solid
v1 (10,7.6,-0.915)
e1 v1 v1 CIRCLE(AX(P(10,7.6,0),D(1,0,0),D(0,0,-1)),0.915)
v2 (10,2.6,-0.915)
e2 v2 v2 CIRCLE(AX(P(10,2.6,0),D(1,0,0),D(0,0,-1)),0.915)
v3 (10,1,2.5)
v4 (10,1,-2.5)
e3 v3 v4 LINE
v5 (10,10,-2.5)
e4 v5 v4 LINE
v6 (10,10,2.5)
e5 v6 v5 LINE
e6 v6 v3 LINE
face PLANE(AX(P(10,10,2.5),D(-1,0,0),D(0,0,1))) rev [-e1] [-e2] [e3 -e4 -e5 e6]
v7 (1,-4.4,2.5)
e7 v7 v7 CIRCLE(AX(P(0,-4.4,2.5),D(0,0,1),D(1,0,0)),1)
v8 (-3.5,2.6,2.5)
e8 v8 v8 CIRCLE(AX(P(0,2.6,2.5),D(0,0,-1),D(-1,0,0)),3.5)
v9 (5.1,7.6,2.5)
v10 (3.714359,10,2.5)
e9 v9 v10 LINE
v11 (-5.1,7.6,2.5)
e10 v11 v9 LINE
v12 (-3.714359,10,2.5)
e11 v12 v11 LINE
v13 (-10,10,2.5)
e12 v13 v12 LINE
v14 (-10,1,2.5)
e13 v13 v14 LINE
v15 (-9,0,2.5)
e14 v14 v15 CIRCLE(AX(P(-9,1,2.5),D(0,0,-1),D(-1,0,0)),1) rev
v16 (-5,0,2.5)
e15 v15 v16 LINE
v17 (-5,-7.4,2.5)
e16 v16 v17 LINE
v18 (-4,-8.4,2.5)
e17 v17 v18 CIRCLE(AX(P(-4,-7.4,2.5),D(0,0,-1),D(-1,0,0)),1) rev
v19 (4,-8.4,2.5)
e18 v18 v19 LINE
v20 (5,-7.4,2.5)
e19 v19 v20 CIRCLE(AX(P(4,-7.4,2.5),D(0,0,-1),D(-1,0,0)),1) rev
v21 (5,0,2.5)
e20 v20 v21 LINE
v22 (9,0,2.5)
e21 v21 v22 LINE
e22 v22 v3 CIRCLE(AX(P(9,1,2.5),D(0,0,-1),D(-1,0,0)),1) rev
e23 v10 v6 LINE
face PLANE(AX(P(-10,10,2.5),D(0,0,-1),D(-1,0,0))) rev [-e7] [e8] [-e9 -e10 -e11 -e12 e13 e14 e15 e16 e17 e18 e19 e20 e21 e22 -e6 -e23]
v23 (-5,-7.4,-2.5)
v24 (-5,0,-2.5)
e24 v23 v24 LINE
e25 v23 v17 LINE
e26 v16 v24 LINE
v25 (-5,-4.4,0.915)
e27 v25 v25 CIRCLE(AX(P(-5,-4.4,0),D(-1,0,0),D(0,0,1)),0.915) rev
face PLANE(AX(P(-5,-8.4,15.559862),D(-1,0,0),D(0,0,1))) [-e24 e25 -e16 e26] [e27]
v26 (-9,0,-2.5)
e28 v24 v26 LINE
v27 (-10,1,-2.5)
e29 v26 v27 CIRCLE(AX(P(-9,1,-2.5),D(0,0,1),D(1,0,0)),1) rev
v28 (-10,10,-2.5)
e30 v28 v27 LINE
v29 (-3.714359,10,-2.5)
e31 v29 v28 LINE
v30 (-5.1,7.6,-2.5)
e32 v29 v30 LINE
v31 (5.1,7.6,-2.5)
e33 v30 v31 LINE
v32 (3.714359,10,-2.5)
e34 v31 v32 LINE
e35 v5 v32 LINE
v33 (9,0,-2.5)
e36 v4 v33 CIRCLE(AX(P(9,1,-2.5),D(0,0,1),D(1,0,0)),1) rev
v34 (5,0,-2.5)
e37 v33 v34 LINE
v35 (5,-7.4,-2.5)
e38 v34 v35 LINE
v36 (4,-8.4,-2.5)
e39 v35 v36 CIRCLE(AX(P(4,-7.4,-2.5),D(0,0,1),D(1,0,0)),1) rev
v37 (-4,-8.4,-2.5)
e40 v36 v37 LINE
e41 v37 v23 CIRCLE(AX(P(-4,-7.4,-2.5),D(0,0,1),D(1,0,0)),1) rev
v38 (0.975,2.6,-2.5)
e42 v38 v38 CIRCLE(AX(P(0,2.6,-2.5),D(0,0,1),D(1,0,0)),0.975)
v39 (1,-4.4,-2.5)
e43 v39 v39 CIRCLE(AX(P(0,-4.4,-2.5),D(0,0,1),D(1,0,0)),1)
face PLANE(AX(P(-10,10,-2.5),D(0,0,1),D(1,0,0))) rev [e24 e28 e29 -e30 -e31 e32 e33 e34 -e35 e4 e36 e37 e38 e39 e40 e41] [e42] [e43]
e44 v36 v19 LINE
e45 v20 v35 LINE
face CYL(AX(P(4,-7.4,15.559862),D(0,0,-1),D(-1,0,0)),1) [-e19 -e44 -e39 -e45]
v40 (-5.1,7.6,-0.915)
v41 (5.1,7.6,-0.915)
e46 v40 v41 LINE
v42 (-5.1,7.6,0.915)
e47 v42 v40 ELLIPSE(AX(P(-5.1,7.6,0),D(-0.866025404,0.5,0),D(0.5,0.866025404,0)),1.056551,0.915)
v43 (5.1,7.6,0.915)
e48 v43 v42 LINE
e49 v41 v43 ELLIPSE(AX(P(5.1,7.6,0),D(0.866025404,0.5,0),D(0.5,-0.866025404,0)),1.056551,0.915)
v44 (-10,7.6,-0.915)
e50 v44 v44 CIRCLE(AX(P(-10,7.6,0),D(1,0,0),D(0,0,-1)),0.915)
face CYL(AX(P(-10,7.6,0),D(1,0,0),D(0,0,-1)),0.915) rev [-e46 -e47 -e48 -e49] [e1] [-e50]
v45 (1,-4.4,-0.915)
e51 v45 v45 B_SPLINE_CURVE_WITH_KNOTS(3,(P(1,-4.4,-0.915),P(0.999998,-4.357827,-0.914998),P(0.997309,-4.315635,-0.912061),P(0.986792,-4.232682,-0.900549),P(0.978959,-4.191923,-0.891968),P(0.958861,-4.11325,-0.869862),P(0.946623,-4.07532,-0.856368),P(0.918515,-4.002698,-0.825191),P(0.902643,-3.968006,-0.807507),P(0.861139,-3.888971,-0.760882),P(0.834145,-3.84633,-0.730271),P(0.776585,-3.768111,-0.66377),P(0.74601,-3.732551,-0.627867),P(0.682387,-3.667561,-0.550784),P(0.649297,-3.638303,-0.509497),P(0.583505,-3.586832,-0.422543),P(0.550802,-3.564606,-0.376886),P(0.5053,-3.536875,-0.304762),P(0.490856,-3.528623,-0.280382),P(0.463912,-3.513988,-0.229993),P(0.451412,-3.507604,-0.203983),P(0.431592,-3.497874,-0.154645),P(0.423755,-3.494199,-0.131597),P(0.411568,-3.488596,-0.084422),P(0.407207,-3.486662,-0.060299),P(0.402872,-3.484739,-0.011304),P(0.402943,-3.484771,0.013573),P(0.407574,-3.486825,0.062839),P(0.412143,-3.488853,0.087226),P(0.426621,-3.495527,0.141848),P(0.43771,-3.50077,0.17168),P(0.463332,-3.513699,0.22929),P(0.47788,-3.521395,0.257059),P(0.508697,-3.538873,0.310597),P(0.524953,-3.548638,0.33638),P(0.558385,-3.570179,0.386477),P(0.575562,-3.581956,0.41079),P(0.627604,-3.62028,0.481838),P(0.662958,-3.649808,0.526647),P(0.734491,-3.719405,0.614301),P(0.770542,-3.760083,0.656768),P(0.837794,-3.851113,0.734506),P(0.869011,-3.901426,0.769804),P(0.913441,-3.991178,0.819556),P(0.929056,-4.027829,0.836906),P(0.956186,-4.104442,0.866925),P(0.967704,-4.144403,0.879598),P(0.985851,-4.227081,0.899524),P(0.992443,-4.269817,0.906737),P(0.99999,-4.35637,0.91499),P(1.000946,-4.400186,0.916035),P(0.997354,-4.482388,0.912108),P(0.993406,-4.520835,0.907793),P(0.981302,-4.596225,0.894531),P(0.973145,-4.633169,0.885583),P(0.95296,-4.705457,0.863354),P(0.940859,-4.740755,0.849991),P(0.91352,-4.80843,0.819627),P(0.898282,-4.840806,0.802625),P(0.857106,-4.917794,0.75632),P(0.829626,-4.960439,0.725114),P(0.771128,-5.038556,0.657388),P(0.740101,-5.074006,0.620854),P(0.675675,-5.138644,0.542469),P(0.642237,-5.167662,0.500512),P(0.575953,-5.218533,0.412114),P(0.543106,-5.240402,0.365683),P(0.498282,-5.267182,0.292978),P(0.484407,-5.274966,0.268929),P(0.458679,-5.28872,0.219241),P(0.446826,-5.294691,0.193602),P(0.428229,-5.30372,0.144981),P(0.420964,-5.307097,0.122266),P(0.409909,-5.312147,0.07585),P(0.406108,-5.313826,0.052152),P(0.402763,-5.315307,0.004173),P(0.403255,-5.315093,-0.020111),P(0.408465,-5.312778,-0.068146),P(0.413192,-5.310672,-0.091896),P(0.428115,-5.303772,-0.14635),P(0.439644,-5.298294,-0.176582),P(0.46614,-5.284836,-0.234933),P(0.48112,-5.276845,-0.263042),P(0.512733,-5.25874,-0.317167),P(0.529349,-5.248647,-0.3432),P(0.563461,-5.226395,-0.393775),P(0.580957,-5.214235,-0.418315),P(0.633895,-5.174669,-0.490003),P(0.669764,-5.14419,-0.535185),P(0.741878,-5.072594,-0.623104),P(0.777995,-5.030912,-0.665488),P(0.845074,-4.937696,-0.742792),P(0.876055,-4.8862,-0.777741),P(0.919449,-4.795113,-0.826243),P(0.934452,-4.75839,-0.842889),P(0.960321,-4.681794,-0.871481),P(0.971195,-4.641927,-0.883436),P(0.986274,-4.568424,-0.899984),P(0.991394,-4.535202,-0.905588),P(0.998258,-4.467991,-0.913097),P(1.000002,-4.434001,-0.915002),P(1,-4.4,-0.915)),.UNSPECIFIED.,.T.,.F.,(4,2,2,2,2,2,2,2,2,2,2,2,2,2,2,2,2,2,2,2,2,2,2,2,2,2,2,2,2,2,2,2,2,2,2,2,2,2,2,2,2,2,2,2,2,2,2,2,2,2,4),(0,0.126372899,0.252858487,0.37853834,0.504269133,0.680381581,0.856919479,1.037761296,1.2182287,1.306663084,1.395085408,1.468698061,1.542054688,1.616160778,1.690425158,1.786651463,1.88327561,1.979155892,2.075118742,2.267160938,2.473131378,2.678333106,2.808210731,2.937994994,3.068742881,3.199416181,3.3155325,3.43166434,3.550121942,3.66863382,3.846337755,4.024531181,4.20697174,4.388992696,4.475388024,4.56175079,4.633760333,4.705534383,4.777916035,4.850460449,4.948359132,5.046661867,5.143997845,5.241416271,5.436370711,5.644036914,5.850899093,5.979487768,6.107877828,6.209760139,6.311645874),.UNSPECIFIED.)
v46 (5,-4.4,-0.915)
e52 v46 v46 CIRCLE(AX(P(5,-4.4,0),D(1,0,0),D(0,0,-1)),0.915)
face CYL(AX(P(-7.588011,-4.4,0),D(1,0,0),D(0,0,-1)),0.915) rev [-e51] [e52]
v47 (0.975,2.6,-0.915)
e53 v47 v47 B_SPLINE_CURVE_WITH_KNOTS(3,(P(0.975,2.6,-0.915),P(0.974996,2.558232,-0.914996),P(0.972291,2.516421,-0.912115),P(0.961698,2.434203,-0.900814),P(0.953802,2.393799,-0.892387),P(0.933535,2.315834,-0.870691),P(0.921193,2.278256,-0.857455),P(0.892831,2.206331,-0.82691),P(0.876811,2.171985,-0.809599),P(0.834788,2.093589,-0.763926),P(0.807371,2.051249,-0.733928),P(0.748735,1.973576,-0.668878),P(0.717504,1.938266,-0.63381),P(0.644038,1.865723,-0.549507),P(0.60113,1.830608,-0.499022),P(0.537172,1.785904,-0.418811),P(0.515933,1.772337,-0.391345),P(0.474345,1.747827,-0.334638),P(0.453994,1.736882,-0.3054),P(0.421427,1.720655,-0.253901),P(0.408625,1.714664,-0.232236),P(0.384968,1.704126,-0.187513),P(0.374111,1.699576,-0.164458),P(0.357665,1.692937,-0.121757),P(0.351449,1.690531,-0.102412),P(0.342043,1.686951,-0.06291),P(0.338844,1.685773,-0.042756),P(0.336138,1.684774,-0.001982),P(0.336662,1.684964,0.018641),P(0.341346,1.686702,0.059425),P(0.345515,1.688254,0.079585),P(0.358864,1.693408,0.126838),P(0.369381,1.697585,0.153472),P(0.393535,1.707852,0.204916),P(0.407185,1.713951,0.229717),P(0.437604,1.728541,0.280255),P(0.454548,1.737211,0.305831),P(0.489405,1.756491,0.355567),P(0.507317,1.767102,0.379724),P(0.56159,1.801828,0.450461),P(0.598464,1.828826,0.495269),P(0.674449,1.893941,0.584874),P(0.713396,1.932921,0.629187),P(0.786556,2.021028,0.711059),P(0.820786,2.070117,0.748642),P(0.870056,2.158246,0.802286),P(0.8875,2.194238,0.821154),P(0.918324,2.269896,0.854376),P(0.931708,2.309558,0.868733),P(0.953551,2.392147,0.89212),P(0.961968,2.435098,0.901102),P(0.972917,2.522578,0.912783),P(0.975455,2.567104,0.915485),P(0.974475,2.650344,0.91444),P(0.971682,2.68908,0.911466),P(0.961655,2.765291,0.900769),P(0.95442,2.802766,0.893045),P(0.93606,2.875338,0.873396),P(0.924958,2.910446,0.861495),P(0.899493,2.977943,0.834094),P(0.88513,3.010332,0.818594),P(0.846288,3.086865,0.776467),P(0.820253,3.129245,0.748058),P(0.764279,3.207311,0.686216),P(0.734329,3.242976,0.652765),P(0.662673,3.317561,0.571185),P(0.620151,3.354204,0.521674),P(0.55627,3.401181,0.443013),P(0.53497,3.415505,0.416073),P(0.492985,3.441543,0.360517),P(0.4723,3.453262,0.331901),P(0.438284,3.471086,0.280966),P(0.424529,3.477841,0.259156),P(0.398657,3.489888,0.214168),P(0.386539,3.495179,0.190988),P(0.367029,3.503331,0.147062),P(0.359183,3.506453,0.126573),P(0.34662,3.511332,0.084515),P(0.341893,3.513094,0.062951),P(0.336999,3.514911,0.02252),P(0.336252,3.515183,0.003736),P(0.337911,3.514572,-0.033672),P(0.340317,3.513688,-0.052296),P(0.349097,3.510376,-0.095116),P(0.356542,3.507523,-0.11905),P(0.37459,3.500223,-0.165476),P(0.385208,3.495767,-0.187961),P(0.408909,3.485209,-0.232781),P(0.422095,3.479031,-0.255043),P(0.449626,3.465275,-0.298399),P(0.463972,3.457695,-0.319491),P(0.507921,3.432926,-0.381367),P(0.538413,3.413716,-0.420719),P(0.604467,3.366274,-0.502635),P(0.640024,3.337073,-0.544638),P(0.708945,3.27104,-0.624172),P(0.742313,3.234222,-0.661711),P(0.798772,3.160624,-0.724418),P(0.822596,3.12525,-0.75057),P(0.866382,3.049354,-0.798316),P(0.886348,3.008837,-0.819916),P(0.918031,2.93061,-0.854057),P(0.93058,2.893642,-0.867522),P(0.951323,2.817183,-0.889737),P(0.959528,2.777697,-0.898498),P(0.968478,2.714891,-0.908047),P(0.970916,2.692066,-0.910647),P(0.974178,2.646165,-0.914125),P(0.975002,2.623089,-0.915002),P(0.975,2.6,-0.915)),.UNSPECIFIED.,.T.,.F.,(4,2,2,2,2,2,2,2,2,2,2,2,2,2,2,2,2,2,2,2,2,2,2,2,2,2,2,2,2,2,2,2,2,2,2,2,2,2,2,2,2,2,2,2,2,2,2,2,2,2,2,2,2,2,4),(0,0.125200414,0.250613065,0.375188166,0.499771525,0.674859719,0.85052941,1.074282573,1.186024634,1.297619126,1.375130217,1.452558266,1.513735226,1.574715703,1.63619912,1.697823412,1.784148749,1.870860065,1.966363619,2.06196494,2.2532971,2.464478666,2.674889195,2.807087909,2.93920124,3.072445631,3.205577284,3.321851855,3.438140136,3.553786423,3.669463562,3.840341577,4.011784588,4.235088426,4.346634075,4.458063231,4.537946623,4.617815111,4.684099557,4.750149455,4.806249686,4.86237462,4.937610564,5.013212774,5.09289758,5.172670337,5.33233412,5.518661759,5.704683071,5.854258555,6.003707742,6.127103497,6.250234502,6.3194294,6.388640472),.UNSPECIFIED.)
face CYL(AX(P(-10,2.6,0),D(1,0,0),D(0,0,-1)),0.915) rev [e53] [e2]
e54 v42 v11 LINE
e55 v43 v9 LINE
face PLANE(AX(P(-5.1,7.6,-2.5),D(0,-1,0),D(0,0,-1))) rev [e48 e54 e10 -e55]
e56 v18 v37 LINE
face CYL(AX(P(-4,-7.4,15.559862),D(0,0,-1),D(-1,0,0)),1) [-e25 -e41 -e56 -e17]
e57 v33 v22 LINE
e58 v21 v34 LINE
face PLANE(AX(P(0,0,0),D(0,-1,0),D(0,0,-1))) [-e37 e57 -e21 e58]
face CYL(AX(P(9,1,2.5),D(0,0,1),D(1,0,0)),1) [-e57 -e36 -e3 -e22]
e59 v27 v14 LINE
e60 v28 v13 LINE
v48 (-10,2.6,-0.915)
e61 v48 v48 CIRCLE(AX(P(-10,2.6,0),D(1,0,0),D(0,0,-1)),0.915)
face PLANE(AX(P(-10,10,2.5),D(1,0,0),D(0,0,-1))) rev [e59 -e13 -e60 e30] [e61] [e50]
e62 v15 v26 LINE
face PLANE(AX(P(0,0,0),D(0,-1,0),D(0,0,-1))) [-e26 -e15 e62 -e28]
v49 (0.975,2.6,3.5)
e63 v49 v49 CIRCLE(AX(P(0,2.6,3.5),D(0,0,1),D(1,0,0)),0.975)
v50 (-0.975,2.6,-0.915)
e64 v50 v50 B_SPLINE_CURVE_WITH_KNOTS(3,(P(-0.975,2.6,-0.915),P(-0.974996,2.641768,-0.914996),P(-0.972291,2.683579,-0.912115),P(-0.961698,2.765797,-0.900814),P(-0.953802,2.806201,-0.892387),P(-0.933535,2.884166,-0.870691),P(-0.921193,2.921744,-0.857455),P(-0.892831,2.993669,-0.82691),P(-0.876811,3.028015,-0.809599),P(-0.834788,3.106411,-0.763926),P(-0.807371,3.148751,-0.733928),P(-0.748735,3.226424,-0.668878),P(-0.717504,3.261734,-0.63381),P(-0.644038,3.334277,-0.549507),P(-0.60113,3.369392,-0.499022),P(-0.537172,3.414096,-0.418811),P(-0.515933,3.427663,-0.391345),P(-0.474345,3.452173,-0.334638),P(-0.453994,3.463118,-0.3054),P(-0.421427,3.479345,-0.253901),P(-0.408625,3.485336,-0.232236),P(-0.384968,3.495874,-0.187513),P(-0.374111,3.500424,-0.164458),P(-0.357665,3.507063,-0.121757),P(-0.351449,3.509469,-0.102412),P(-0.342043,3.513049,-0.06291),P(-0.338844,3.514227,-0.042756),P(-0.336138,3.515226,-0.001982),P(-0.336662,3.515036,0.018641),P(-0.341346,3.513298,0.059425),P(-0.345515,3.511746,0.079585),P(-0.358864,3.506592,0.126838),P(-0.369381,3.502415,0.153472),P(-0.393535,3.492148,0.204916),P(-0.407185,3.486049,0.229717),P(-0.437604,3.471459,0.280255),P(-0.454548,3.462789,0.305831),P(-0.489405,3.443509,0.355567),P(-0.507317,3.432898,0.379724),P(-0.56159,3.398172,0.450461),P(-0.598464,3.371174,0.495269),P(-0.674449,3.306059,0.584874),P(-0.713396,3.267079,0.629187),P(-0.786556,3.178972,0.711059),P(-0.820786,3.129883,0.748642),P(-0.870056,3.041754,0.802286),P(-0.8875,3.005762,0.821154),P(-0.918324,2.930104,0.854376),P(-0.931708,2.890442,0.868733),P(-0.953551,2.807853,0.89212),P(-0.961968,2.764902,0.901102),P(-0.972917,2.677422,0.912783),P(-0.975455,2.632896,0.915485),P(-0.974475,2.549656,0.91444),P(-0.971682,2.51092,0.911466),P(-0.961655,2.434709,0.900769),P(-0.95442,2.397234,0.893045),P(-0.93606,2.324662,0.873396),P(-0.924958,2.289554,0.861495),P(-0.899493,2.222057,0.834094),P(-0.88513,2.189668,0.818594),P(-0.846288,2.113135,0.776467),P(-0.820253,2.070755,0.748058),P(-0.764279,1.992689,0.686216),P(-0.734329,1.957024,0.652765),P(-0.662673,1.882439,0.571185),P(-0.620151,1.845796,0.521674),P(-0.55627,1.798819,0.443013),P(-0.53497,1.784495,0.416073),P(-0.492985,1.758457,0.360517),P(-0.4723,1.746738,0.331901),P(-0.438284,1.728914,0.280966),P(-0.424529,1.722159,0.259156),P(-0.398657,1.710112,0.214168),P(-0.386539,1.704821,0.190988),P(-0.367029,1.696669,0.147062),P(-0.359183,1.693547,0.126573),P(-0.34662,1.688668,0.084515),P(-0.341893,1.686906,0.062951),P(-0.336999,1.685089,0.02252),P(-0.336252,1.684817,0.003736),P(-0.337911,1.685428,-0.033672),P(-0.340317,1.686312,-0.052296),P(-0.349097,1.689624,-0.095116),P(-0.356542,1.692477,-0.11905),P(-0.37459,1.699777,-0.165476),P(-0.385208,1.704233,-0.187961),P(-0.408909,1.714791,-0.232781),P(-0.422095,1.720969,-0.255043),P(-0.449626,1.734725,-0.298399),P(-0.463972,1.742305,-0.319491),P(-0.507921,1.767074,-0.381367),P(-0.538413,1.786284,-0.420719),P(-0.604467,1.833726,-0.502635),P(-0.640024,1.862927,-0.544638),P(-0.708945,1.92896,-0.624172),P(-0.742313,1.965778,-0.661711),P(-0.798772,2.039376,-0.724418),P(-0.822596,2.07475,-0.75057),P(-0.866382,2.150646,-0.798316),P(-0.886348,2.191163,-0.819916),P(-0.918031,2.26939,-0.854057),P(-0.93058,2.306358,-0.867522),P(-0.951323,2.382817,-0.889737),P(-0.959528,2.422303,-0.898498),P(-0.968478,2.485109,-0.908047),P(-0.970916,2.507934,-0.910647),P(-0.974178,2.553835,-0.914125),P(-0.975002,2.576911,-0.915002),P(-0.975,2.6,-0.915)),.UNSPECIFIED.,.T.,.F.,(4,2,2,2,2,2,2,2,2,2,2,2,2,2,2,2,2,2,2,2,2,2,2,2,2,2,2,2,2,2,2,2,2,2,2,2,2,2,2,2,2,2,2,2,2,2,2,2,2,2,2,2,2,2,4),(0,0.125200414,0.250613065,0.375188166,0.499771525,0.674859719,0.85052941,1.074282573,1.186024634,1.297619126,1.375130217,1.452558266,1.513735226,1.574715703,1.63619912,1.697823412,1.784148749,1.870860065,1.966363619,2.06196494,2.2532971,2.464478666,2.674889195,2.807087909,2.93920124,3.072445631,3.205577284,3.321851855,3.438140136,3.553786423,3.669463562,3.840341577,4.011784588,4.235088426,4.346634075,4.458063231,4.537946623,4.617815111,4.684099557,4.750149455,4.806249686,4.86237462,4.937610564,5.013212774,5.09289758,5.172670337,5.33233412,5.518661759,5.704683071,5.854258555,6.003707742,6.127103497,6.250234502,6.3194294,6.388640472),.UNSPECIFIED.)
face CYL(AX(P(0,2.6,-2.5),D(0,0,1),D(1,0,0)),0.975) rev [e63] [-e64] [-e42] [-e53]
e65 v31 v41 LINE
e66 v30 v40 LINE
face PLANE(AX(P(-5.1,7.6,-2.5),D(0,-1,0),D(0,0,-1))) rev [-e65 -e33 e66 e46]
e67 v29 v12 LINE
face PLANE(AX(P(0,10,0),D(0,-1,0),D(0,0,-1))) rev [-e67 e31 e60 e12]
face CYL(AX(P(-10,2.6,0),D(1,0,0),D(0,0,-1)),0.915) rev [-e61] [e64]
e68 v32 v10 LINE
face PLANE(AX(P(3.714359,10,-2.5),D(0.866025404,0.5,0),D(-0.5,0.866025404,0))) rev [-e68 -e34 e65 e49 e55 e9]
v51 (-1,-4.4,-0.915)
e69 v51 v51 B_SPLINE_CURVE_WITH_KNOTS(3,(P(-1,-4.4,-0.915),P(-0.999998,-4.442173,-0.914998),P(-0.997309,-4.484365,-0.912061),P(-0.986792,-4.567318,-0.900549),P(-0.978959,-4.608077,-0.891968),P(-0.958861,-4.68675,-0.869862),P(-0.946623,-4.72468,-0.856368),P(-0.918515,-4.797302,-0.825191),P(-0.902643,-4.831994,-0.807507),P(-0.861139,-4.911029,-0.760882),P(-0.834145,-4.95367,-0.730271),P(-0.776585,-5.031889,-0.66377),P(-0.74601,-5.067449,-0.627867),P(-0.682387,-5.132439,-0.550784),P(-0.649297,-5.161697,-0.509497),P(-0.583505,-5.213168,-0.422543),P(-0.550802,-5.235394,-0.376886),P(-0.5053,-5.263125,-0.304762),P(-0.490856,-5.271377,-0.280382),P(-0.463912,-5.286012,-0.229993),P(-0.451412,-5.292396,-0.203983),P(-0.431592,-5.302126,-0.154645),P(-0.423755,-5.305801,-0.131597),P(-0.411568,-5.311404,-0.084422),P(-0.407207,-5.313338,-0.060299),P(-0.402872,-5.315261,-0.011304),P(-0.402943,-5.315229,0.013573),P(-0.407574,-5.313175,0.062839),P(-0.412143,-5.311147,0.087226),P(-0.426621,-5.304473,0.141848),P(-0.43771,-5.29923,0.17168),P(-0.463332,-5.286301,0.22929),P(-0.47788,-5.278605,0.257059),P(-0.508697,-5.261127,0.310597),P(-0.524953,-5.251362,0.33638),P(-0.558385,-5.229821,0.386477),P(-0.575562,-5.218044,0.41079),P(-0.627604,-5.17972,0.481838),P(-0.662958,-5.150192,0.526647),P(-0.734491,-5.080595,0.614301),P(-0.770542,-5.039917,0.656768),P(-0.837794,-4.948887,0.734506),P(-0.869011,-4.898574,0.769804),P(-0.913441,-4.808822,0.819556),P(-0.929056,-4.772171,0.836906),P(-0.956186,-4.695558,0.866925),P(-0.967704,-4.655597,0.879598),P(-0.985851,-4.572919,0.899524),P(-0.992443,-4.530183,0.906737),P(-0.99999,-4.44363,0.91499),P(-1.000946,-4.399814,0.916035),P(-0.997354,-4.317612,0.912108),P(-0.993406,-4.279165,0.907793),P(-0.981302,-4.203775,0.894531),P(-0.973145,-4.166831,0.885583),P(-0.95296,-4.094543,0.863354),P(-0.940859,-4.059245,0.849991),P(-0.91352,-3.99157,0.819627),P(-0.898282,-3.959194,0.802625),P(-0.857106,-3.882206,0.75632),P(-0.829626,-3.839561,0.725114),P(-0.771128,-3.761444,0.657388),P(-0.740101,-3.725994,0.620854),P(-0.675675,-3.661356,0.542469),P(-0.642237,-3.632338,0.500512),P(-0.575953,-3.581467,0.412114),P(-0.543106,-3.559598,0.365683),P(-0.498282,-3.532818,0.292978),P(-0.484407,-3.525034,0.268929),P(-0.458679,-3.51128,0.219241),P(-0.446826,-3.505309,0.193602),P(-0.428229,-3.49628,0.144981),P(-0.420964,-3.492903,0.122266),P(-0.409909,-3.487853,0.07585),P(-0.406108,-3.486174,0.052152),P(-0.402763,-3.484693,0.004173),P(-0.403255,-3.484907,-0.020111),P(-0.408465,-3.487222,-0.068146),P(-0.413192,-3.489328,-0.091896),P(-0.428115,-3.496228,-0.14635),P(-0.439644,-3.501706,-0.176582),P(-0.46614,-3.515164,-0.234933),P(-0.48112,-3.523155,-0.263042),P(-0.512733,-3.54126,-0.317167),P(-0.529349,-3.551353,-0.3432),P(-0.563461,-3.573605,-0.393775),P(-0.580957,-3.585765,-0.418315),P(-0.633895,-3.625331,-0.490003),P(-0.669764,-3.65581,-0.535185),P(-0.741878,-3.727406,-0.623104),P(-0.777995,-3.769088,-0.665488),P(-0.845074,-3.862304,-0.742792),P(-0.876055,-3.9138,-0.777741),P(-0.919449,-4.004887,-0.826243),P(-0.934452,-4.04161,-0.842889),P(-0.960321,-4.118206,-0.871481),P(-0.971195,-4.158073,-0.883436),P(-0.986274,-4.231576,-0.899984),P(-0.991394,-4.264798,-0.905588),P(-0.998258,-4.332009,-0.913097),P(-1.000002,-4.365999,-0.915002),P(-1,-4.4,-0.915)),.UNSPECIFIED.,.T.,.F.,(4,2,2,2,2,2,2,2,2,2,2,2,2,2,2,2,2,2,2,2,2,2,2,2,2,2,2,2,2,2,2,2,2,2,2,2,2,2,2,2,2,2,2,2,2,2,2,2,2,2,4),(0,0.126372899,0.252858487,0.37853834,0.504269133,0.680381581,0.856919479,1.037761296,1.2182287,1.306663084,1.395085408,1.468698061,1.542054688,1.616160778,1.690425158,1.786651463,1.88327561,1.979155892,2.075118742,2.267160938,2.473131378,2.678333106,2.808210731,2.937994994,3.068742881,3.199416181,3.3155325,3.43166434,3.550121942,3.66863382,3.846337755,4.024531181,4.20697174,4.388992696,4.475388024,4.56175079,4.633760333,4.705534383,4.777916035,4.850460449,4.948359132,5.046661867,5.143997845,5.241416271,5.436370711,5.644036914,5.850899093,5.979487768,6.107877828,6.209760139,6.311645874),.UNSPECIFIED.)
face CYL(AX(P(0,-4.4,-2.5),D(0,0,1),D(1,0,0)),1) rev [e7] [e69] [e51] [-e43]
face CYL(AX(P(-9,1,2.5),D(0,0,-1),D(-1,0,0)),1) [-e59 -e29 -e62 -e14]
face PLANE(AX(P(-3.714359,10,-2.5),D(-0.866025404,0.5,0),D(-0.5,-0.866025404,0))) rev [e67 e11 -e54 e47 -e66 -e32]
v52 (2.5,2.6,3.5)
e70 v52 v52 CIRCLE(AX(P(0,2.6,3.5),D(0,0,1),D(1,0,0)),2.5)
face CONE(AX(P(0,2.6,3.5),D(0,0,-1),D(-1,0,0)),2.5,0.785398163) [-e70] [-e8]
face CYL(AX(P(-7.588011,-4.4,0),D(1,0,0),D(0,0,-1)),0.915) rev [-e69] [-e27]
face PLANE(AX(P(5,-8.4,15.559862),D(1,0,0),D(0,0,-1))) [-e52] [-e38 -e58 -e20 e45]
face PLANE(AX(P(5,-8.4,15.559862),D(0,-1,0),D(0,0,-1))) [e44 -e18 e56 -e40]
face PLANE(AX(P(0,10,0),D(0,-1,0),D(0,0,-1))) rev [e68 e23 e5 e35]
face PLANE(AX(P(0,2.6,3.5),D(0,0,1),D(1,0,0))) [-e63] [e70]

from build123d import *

# Parameters (mm, degrees)
SKETCH1_W           = 20
SKETCH1_H           = 5
BOSS_EXTRUDE1_DEPTH = 10
CUT_EXTRUDE1_DEPTH  = 16
SKETCH8_R           = 0.915
CUT_EXTRUDE6_DEPTH  = 23.5
SKETCH7_R           = 0.915
CUT_EXTRUDE5_DEPTH  = 23.5
SKETCH10_R          = 2.5
BOSS_EXTRUDE4_DEPTH = 1
SKETCH5_W           = 10
SKETCH5_H           = 8.4
BOSS_EXTRUDE3_DEPTH = 5
SKETCH6_R           = 1
CUT_EXTRUDE4_DEPTH  = 16
CUT_EXTRUDE7_REACH  = 20.364
SKETCH9_R           = 0.915
SKETCH11_R          = 0.975
CUT_EXTRUDE8_DEPTH  = 16.362291535
CHAMFER1_SIZE       = 1
FILLET1_R           = 1


with BuildPart() as part:
    # Sketch1 → Boss-Extrude1 (new body)
    with BuildSketch(Plane(origin=(0, 0, 0), x_dir=(1, 0, 0), z_dir=(0, 1, 0))):
        Rectangle(SKETCH1_W, SKETCH1_H)
    extrude(amount=BOSS_EXTRUDE1_DEPTH)

    # Sketch2 → Cut-Extrude1 (cut, through all)
    with BuildSketch(Plane.XY.offset(2.5)):
        Polygon((3.714359354, 10), (-3.714359354, 10), (-5.1, 7.6), (5.1, 7.6), align=None)
    extrude(amount=-CUT_EXTRUDE1_DEPTH, mode=Mode.SUBTRACT)

    # Sketch8 → Cut-Extrude6 (cut, through all)
    with BuildSketch(Plane(origin=(10, 0, 0), x_dir=(0, 0, -1), z_dir=(1, 0, 0))):
        with Locations((0, 7.6)):
            Circle(SKETCH8_R)
    extrude(amount=-CUT_EXTRUDE6_DEPTH, mode=Mode.SUBTRACT)

    # Sketch7 → Cut-Extrude5 (cut, through all)
    with BuildSketch(Plane(origin=(10, 0, 0), x_dir=(0, 0, -1), z_dir=(1, 0, 0))):
        with Locations((0, 2.6)):
            Circle(SKETCH7_R)
    extrude(amount=-CUT_EXTRUDE5_DEPTH, mode=Mode.SUBTRACT)

    # Sketch10 → Boss-Extrude4 (add)
    with BuildSketch(Plane.XY.offset(2.5)):
        with Locations(Location((0, 2.6, 0), (0, 0, 180))):
            Circle(SKETCH10_R)
    extrude(amount=BOSS_EXTRUDE4_DEPTH)

    # Sketch5 → Boss-Extrude3 (add)
    with BuildSketch(Plane(origin=(0, 0, -2.5), x_dir=(-1, 0, 0), z_dir=(0, 0, -1))):
        with Locations((0, -4.2)):
            Rectangle(SKETCH5_W, SKETCH5_H)
    extrude(amount=-BOSS_EXTRUDE3_DEPTH)

    # Sketch6 → Cut-Extrude4 (cut, through all)
    with BuildSketch(Plane.XY.offset(2.5)):
        with Locations((0, -4.4)):
            Circle(SKETCH6_R)
    extrude(amount=-CUT_EXTRUDE4_DEPTH, mode=Mode.SUBTRACT)

    # Cut-Extrude7: up to this face of the body (flat: up to its plane)
    cut_extrude7_end = Plane(part.part.faces().sort_by_distance((-5, -4.2, 0))[0])
    # Sketch9 → Cut-Extrude7 (cut, up to the picked face)
    with BuildSketch(Plane(origin=(5, 0, 0), x_dir=(0, 0, -1), z_dir=(1, 0, 0)), mode=Mode.PRIVATE) as cut_extrude7_sk1:
        with Locations((0, -4.4)):
            Circle(SKETCH9_R)
    cut_extrude7_tool1 = split(extrude(cut_extrude7_sk1.sketch, amount=-CUT_EXTRUDE7_REACH, mode=Mode.PRIVATE), bisect_by=cut_extrude7_end, keep=Keep.BOTH, mode=Mode.PRIVATE)
    add(cut_extrude7_tool1.solids().sort_by(Axis((5, -4.4, 0), (-1, 0, 0)))[0], mode=Mode.SUBTRACT)

    # Sketch11 → Cut-Extrude8 (cut, through all)
    with BuildSketch(Plane.XY.offset(3.5)):
        with Locations((0, 2.6)):
            Circle(SKETCH11_R)
    extrude(amount=-CUT_EXTRUDE8_DEPTH, mode=Mode.SUBTRACT)

    # Chamfer1
    chamfer1_edges = [part.edges().sort_by_distance(p)[0] for p in [
        (2.5, 2.6, 2.5),
    ]]
    chamfer(chamfer1_edges, length=CHAMFER1_SIZE - 0.0001)  # a hair under: the kernel refuses the full size

    # Fillet1
    fillet1_edges = [part.edges().sort_by_distance(p)[0] for p in [
        (-10, 0, 0),
        (-5, -8.4, 0),
        (5, -8.4, 0),
        (10, 0, 0),
    ]]
    fillet(fillet1_edges, radius=FILLET1_R)


solid = part.part
